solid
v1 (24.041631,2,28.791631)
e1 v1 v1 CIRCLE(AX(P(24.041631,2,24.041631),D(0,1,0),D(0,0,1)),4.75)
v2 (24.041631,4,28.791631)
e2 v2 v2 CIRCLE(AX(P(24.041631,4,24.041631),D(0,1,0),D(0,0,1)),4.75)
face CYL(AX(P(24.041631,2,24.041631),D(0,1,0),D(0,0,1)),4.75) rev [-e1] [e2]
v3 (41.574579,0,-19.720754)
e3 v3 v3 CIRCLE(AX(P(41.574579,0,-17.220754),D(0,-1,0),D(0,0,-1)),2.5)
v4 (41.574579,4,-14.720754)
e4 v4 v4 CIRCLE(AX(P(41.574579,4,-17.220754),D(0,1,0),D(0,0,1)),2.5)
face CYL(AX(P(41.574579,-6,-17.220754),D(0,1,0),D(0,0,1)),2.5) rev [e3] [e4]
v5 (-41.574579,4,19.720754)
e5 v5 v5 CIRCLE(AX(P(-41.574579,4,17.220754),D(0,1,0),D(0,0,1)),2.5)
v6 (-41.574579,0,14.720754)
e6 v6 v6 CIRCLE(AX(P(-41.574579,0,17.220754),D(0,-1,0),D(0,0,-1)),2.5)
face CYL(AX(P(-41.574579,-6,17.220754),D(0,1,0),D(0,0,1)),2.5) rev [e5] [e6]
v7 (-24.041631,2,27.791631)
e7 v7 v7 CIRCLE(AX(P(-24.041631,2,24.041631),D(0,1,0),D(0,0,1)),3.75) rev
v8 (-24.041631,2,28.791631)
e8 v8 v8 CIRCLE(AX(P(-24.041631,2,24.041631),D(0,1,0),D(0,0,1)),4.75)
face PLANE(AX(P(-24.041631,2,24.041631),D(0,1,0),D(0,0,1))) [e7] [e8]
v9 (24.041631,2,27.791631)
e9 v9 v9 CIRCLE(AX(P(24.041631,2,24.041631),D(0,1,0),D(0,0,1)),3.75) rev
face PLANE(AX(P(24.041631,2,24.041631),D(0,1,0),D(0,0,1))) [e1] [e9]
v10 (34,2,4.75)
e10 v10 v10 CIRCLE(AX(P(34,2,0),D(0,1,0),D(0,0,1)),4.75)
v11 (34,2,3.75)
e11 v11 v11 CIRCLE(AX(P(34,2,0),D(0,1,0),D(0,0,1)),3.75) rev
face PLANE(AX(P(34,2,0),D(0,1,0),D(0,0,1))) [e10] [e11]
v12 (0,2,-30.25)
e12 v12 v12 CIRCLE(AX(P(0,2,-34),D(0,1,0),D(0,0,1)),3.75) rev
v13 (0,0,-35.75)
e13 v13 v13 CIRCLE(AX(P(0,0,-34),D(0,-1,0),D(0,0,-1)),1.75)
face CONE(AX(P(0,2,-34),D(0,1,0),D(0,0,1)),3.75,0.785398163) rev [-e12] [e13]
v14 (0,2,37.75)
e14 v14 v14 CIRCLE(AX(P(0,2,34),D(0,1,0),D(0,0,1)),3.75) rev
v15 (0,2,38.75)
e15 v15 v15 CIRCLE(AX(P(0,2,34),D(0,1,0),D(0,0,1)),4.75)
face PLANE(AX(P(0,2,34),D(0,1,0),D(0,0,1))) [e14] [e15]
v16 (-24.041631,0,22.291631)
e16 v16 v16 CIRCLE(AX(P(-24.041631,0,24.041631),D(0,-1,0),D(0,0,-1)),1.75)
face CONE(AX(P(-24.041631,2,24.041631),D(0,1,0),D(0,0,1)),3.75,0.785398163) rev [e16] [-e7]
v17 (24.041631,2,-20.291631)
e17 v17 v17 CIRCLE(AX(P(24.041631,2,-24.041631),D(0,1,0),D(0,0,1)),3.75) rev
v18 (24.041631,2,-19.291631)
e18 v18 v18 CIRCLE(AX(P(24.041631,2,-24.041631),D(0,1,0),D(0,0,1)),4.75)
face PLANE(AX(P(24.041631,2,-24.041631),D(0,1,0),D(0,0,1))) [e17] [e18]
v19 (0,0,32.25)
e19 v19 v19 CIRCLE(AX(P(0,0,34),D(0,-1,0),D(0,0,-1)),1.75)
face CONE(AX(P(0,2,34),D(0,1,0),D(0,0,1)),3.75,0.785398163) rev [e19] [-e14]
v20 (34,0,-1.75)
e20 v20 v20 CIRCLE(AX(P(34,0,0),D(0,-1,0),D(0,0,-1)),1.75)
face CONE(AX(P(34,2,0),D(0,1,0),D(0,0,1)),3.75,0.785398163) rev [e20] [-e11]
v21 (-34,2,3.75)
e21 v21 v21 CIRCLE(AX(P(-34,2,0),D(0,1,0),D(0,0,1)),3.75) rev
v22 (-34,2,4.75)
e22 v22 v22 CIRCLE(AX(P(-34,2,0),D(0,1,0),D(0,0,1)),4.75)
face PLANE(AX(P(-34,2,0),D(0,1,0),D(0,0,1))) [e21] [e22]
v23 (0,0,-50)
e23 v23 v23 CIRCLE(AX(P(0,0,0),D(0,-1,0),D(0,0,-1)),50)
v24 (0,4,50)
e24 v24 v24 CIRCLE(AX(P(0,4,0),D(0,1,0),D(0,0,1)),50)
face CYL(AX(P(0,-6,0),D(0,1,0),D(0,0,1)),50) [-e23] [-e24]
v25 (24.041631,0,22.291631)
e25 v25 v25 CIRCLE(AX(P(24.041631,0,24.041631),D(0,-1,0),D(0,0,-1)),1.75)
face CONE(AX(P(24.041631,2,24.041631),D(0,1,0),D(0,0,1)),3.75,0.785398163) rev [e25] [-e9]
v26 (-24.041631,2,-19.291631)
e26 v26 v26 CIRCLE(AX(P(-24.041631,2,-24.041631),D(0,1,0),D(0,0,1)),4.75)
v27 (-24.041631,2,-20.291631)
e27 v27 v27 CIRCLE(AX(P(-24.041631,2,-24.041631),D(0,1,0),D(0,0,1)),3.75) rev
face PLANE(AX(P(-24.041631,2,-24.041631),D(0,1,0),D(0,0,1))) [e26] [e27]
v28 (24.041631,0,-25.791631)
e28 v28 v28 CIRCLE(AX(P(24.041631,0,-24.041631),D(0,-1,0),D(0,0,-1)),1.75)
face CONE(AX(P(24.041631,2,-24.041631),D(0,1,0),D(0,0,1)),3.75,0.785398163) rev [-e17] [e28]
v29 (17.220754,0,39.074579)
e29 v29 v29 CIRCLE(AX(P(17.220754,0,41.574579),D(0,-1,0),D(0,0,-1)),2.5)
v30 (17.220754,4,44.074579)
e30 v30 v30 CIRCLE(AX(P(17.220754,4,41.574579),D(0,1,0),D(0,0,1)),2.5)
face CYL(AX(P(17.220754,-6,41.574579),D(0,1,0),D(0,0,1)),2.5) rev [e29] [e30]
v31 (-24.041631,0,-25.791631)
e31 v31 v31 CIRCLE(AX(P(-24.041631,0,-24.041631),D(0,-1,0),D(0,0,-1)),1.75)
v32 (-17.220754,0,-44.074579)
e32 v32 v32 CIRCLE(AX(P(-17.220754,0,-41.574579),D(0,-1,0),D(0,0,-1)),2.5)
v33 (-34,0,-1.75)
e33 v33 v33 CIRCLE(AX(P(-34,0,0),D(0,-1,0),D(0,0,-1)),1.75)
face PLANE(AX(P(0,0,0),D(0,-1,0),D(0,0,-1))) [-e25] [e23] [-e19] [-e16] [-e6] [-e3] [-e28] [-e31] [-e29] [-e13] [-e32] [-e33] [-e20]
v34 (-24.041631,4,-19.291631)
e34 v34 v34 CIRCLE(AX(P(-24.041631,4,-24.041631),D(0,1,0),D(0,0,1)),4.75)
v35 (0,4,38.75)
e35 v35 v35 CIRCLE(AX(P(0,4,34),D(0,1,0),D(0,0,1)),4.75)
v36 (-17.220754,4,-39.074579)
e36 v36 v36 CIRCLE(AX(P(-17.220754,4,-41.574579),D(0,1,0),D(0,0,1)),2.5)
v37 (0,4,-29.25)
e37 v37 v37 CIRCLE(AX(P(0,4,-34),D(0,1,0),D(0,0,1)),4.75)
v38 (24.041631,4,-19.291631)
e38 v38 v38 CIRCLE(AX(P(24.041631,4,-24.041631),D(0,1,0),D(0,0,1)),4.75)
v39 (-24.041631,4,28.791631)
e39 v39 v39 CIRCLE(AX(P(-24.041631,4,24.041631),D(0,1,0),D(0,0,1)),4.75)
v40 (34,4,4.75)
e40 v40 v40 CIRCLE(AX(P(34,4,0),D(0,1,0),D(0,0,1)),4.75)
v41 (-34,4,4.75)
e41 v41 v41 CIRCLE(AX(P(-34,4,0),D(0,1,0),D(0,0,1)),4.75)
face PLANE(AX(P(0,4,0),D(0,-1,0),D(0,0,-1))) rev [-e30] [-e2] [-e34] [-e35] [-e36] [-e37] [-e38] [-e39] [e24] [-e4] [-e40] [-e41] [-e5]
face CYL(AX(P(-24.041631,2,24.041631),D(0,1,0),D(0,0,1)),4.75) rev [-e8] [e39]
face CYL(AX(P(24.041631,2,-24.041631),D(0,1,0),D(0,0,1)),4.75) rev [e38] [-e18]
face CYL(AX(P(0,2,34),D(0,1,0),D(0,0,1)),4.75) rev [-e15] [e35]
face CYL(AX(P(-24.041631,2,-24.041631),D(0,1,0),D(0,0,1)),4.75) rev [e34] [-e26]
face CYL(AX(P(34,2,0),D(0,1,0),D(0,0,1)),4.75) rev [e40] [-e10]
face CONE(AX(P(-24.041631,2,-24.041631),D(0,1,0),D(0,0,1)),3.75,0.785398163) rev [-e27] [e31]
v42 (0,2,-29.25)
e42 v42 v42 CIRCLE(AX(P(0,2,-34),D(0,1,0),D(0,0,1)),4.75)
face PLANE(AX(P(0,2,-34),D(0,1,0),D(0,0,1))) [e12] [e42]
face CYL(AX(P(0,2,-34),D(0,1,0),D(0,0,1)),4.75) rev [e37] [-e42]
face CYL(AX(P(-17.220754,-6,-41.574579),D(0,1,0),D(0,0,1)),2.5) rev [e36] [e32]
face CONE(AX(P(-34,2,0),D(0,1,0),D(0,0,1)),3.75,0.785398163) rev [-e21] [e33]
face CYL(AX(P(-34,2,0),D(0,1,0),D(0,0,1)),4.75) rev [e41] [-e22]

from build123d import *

# Parameters (mm, degrees)
SKETCH1_W           = 100
SKETCH1_H           = 100
BOSS_EXTRUDE1_DEPTH = 4
SKETCH2_R           = 1.75
CUT_EXTRUDE1_DEPTH  = 10
SKETCH3_OUTSIDE_W   = 130.296
SKETCH3_OUTSIDE_H   = 130.296
SKETCH3_OUTSIDE_R   = 50
CUT_EXTRUDE2_DEPTH  = 10
SKETCH4_R           = 2.5
CUT_EXTRUDE3_DEPTH  = 10
SKETCH5_R           = 4.75
CUT_EXTRUDE4_DEPTH  = 2
CHAMFER1_SIZE       = 2


with BuildPart() as part:
    # Sketch1 → Boss-Extrude1 (new body)
    with BuildSketch(Plane(origin=(0, 0, 0), x_dir=(1, 0, 0), z_dir=(0, 1, 0))):
        Rectangle(SKETCH1_W, SKETCH1_H)
    extrude(amount=BOSS_EXTRUDE1_DEPTH)

    # Sketch2 → Cut-Extrude1 (cut)
    with BuildSketch(Plane(origin=(0, 4, 0), x_dir=(1, 0, 0), z_dir=(0, 1, 0))):
        with Locations(Location((-34, 0, 0), (0, 0, 270))):
            Circle(SKETCH2_R)
        with Locations(Location((-24.04163056, 24.04163056, 0), (0, 0, 270))):
            Circle(SKETCH2_R)
        with Locations(Location((0, 34, 0), (0, 0, 270))):
            Circle(SKETCH2_R)
        with Locations(Location((24.04163056, 24.04163056, 0), (0, 0, 270))):
            Circle(SKETCH2_R)
        with Locations(Location((34, 0, 0), (0, 0, 270))):
            Circle(SKETCH2_R)
        with Locations(Location((24.04163056, -24.04163056, 0), (0, 0, 270))):
            Circle(SKETCH2_R)
        with Locations(Location((0, -34, 0), (0, 0, 270))):
            Circle(SKETCH2_R)
        with Locations(Location((-24.04163056, -24.04163056, 0), (0, 0, 270))):
            Circle(SKETCH2_R)
    extrude(amount=-CUT_EXTRUDE1_DEPTH, mode=Mode.SUBTRACT)

    # Sketch3 outside → Cut-Extrude2 (cut)
    with BuildSketch(Plane(origin=(0, 4, 0), x_dir=(1, 0, 0), z_dir=(0, 1, 0))):
        Rectangle(SKETCH3_OUTSIDE_W, SKETCH3_OUTSIDE_H)
        with Locations(Location((0, 0, 0), (0, 0, 270))):
            Circle(SKETCH3_OUTSIDE_R, mode=Mode.SUBTRACT)
    extrude(amount=-CUT_EXTRUDE2_DEPTH, mode=Mode.SUBTRACT)

    # Sketch4 → Cut-Extrude3 (cut)
    with BuildSketch(Plane(origin=(0, 4, 0), x_dir=(1, 0, 0), z_dir=(0, 1, 0))):
        with BuildLine():
            ThreePointArc((-18.177463037, 43.884277794), (-19.530453288, 40.617870382), (-16.264045876, 39.264880132))
            Line((-16.264045876, 39.264880132), (-18.177463037, 43.884277794))
        make_face()
        with BuildLine():
            Line((-18.177463037, 43.884277794), (-16.264045876, 39.264880132))
            ThreePointArc((-16.264045876, 39.264880132), (-15.142080426, 40.18565338), (-14.720754456, 41.574578963))
            ThreePointArc((-14.720754456, 41.574578963), (-15.831828874, 43.653252994), (-18.177463037, 43.884277794))
        make_face()
        with Locations(Location((41.574578963, 17.220754456, 0), (0, 0, 270))):
            Circle(SKETCH4_R)
        with Locations(Location((-41.574578963, -17.220754456, 0), (0, 0, 270))):
            Circle(SKETCH4_R)
        with Locations(Location((17.220754456, -41.574578963, 0), (0, 0, 270))):
            Circle(SKETCH4_R)
    extrude(amount=-CUT_EXTRUDE3_DEPTH, mode=Mode.SUBTRACT)

    # Sketch5 → Cut-Extrude4 (cut)
    with BuildSketch(Plane(origin=(0, 4, 0), x_dir=(1, 0, 0), z_dir=(0, 1, 0))):
        with Locations(Location((0, -34, 0), (0, 0, 270))):
            Circle(SKETCH5_R)
        with Locations(Location((24.04163056, -24.04163056, 0), (0, 0, 270))):
            Circle(SKETCH5_R)
        with Locations(Location((34, 0, 0), (0, 0, 270))):
            Circle(SKETCH5_R)
        with Locations(Location((24.04163056, 24.04163056, 0), (0, 0, 270))):
            Circle(SKETCH5_R)
        with Locations(Location((-24.04163056, -24.04163056, 0), (0, 0, 270))):
            Circle(SKETCH5_R)
        with Locations(Location((-34, 0, 0), (0, 0, 270))):
            Circle(SKETCH5_R)
        with Locations(Location((-24.04163056, 24.04163056, 0), (0, 0, 270))):
            Circle(SKETCH5_R)
        with Locations(Location((0, 34, 0), (0, 0, 270))):
            Circle(SKETCH5_R)
    extrude(amount=-CUT_EXTRUDE4_DEPTH, mode=Mode.SUBTRACT)

    # Chamfer1
    chamfer1_edges = [part.edges().sort_by_distance(p)[0] for p in [
        (0, 2, 32.25),
        (0, 2, -35.75),
        (-24.04163056, 2, -25.79163056),
        (-34, 2, -1.75),
        (24.04163056, 2, 22.29163056),
        (34, 2, -1.75),
        (24.04163056, 2, -25.79163056),
        (-24.04163056, 2, 22.29163056),
    ]]
    chamfer(chamfer1_edges, length=CHAMFER1_SIZE - 0.0001)  # a hair under: the kernel refuses the full size


solid = part.part
